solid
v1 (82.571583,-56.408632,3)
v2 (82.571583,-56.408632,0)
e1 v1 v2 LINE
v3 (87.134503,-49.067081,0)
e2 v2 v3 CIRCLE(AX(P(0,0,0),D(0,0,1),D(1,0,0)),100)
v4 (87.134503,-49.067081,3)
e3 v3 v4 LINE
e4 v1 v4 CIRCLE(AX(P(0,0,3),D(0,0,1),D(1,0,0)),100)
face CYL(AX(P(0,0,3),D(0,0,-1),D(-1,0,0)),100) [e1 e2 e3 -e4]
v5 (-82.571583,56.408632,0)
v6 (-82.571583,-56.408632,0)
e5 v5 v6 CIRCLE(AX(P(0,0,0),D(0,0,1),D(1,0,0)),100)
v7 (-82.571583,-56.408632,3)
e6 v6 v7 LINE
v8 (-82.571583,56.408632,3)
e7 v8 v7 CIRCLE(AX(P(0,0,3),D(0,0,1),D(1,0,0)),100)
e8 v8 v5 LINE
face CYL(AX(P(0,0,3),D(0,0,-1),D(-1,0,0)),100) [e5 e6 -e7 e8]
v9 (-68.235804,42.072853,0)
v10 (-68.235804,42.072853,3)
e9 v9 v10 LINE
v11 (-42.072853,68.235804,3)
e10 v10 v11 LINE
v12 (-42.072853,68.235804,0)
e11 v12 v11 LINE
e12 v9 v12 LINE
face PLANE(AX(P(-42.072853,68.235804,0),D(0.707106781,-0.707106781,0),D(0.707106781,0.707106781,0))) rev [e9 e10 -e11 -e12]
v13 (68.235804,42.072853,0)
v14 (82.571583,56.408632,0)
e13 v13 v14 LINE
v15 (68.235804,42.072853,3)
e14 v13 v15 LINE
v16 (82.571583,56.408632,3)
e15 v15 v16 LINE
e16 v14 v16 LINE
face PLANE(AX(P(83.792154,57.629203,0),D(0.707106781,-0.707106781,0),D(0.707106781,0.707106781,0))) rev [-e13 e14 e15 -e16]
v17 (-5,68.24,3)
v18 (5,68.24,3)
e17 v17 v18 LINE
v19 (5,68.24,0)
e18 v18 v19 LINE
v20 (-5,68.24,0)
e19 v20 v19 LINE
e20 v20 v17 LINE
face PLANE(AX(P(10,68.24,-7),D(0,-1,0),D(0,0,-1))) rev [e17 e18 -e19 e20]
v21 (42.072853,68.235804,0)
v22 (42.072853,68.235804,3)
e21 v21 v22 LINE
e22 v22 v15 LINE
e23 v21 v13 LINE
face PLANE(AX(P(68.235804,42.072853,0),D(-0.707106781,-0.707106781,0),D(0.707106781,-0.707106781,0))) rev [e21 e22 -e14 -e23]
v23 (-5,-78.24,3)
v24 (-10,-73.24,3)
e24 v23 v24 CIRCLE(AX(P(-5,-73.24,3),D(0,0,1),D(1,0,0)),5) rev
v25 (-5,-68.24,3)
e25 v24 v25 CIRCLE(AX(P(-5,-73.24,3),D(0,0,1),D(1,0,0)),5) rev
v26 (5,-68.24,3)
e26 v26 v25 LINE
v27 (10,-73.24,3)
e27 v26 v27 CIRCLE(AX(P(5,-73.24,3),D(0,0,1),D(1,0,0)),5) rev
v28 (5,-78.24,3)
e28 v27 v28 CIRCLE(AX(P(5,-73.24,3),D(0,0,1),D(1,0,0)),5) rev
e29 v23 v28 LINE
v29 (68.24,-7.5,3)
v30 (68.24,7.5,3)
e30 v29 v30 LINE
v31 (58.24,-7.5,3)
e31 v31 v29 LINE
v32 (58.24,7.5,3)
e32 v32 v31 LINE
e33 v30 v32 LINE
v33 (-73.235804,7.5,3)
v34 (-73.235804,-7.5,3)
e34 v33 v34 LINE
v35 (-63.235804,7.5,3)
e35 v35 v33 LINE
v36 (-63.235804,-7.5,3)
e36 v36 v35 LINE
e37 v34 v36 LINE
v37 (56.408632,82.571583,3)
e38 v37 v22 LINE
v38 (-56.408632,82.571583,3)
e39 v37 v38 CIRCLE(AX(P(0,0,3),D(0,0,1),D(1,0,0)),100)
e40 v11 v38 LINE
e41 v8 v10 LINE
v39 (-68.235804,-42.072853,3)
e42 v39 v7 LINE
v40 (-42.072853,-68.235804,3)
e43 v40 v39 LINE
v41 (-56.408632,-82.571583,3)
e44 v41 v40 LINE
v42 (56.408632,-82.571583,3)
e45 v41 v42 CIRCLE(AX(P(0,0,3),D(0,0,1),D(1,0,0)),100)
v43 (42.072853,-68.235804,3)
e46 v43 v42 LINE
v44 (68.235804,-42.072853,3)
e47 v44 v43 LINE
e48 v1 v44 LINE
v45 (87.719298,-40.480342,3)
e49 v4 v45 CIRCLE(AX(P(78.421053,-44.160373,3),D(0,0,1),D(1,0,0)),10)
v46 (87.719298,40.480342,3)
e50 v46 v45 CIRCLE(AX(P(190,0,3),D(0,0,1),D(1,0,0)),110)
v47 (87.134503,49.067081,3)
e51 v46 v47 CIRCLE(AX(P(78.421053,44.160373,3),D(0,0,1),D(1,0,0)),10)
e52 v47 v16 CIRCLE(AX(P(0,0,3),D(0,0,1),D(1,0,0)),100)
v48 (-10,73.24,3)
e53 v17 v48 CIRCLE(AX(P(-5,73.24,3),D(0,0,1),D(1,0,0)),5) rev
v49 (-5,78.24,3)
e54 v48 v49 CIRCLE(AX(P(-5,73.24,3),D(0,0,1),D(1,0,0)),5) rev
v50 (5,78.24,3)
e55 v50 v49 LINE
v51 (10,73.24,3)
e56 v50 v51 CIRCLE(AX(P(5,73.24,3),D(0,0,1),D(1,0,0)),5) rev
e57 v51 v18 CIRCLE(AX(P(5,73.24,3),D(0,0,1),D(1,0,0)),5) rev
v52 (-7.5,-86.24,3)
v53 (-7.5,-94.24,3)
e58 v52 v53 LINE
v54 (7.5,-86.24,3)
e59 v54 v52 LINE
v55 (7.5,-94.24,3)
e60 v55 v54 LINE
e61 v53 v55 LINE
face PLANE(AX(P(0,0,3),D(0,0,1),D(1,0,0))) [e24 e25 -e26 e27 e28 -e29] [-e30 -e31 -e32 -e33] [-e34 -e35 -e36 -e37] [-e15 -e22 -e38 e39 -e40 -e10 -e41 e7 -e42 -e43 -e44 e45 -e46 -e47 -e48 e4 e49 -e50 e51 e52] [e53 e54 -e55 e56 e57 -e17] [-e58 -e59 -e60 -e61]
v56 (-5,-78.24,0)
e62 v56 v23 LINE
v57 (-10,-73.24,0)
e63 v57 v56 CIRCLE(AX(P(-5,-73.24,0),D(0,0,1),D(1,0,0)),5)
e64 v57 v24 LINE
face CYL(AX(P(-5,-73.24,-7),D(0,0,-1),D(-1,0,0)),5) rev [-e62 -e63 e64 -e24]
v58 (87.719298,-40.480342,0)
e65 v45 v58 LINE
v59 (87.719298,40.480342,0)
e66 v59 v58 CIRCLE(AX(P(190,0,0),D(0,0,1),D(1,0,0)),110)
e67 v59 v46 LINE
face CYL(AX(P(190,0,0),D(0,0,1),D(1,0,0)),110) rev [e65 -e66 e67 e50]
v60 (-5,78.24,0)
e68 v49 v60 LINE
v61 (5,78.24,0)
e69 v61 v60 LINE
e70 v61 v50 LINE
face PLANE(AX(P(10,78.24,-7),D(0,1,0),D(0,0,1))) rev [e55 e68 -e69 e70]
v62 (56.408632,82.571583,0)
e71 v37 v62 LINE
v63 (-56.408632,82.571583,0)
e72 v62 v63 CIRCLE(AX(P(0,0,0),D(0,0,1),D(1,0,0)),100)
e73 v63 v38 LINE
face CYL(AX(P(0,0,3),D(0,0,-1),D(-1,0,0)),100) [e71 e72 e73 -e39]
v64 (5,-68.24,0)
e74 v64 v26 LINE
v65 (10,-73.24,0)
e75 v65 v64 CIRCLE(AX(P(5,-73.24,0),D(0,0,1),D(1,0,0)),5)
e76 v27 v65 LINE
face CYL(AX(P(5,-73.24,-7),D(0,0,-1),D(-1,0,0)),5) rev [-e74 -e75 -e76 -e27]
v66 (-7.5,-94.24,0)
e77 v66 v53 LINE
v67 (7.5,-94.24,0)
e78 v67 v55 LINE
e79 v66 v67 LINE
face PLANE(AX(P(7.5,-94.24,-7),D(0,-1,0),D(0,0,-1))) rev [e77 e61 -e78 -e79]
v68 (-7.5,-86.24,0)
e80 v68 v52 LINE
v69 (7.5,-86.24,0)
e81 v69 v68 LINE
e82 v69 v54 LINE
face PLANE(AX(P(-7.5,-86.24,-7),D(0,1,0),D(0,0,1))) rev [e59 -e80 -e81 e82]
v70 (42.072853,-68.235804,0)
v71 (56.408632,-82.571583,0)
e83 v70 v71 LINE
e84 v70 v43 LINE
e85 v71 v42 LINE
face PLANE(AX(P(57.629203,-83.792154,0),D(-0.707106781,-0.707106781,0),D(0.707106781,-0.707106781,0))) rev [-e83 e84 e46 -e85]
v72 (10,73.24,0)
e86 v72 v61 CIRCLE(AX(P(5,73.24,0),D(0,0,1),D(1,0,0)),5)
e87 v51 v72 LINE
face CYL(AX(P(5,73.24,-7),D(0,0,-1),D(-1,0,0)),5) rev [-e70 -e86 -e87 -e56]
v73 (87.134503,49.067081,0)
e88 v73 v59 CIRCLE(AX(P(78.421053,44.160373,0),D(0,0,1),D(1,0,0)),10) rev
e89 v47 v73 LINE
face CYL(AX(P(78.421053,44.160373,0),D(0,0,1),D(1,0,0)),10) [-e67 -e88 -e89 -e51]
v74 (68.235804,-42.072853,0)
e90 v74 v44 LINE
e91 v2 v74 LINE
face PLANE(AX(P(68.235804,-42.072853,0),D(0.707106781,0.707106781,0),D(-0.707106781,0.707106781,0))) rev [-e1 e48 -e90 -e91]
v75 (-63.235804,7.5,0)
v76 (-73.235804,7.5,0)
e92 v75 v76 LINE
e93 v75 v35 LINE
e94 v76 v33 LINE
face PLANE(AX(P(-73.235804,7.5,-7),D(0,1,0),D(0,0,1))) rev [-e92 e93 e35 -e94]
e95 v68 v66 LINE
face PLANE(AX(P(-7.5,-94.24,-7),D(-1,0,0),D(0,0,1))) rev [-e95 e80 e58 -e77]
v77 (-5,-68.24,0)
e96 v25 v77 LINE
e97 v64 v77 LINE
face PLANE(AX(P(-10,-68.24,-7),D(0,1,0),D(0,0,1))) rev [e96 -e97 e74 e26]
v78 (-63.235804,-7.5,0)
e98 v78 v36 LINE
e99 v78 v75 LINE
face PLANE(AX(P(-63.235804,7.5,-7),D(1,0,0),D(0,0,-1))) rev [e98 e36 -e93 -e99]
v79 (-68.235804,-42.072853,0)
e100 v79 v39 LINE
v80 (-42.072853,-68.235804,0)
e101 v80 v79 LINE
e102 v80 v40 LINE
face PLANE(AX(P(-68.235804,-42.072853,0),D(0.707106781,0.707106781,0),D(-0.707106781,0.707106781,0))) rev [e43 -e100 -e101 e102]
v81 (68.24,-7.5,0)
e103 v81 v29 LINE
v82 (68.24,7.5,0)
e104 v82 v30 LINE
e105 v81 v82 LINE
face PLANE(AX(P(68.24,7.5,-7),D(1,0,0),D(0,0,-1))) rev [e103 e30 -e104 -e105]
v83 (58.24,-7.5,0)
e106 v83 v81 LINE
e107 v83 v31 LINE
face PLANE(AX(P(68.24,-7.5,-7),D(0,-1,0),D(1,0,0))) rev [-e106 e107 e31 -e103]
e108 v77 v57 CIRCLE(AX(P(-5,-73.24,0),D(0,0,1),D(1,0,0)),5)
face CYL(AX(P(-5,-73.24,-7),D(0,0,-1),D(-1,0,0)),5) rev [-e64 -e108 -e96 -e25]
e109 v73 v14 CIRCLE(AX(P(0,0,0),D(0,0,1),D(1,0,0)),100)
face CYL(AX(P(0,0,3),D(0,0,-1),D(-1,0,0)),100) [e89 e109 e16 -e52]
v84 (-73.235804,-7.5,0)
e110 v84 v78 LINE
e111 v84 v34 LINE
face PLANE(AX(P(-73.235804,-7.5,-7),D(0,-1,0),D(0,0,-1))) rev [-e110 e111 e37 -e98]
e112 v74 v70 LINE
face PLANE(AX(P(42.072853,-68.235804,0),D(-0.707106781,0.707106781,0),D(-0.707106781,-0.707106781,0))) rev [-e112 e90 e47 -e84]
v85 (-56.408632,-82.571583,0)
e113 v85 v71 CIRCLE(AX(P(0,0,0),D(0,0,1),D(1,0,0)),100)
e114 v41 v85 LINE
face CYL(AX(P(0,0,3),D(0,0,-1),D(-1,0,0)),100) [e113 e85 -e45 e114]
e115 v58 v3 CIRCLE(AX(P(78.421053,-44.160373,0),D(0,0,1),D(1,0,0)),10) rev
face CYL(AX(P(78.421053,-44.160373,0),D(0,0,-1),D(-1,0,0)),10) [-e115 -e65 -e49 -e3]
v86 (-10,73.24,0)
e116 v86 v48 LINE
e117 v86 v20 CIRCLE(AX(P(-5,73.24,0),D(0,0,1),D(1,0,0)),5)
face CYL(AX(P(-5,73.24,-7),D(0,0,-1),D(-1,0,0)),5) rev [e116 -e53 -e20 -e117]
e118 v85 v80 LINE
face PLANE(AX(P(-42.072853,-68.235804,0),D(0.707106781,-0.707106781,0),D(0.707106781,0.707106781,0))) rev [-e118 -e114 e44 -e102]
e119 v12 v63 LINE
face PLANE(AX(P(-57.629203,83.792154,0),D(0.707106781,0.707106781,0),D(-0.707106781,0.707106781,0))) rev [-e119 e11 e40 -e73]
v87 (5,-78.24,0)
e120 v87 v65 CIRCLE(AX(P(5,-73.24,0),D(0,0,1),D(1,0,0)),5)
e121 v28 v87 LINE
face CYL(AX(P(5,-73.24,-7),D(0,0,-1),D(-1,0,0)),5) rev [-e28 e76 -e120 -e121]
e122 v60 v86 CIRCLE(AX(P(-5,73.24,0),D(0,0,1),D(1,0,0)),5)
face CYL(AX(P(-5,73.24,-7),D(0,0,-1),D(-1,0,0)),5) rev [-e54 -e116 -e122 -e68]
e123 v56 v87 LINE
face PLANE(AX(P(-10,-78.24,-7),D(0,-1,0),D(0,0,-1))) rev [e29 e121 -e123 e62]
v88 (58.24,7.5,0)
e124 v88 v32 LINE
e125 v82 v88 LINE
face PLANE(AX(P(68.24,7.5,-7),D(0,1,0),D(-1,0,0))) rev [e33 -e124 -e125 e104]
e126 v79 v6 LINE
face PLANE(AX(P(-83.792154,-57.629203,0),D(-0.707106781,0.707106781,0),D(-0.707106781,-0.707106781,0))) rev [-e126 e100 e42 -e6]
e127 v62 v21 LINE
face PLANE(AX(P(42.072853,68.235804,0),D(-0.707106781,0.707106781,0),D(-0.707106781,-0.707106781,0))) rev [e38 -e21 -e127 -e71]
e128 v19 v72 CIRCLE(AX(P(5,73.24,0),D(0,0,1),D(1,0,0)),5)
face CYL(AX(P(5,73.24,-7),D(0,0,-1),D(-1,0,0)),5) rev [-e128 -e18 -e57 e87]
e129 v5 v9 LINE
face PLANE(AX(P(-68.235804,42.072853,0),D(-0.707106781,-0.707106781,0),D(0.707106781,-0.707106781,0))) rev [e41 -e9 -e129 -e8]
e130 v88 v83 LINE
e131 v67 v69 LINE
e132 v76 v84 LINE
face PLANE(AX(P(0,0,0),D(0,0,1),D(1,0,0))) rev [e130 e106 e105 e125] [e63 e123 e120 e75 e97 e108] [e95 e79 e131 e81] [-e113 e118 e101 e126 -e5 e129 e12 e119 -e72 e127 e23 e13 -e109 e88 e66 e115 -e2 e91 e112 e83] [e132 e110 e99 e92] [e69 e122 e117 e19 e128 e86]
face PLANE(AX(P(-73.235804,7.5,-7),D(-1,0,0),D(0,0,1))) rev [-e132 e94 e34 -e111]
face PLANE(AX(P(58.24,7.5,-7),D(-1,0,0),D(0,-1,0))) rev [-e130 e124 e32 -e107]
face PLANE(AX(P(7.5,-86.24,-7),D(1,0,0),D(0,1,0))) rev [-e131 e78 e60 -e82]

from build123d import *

# Parameters (mm, degrees)
CROQUIS1_R              = 100
SALIENTE_EXTRUIR1_DEPTH = 3
CROQUIS3_R              = 110
CORTAR_EXTRUIR1_DEPTH   = 3
REDONDEO1_R             = 10
CORTAR_EXTRUIR2_DEPTH   = 142.453172607
CROQUIS6_W              = 10
CROQUIS6_H              = 15
CROQUIS6_W_2            = 20
CROQUIS6_H_2            = 10
CROQUIS6_W_3            = 15
CROQUIS6_H_3            = 8
CORTAR_EXTRUIR4_DEPTH   = 10
REDONDEO3_R             = 5


with BuildPart() as part:
    # Croquis1 → Saliente-Extruir1 (new body)
    with BuildSketch(Plane.XY):
        Circle(CROQUIS1_R)
    extrude(amount=SALIENTE_EXTRUIR1_DEPTH)

    # Croquis3 → Cortar-Extruir1 (cut)
    with BuildSketch(Plane.XY.offset(3)):
        with Locations((190, 0)):
            Circle(CROQUIS3_R)
    extrude(amount=-CORTAR_EXTRUIR1_DEPTH, mode=Mode.SUBTRACT)

    # Redondeo1
    redondeo1_edges = [part.edges().sort_by_distance(p)[0] for p in [
        (89.473684211, -44.659375654, 1.5),
        (89.473684211, 44.659375654, 1.5),
    ]]
    fillet(redondeo1_edges, radius=REDONDEO1_R)

    # Croquis4 → Cortar-Extruir2 (cut, through all)
    with BuildSketch(Plane.XY.offset(3)):
        Polygon((-57.629202667, -83.792153571), (-83.792153571, -57.629202667), (-68.235804385, -42.072853481), (-42.072853481, -68.235804385), align=None)
        Polygon((-57.629202667, 83.792153571), (-42.072853481, 68.235804385), (-68.235804385, 42.072853481), (-83.792153571, 57.629202667), align=None)
        Polygon((83.792153571, 57.629202667), (68.235804385, 42.072853481), (42.072853481, 68.235804385), (57.629202667, 83.792153571), align=None)
        Polygon((57.629202667, -83.792153571), (42.072853481, -68.235804385), (68.235804385, -42.072853481), (83.792153571, -57.629202667), align=None)
    extrude(amount=-CORTAR_EXTRUIR2_DEPTH, mode=Mode.SUBTRACT)

    # Croquis6 → Cortar-Extruir4 (cut)
    with BuildSketch(Plane.XY.offset(3)):
        with Locations((63.24, 0)):
            Rectangle(CROQUIS6_W, CROQUIS6_H)
        with Locations((-68.235804385, 0)):
            Rectangle(CROQUIS6_W, CROQUIS6_H)
        with Locations((0, 73.24)):
            Rectangle(CROQUIS6_W_2, CROQUIS6_H_2)
        with Locations((0, -73.24)):
            Rectangle(CROQUIS6_W_2, CROQUIS6_H_2)
        with Locations((0, -90.24)):
            Rectangle(CROQUIS6_W_3, CROQUIS6_H_3)
    extrude(amount=-CORTAR_EXTRUIR4_DEPTH, mode=Mode.SUBTRACT)

    # Redondeo3
    redondeo3_edges = [part.edges().sort_by_distance(p)[0] for p in [
        (10, 68.24, 1.5),
        (-10, 68.24, 1.5),
        (10, 78.24, 1.5),
        (-10, 78.24, 1.5),
        (10, -78.24, 1.5),
        (-10, -78.24, 1.5),
        (10, -68.24, 1.5),
        (-10, -68.24, 1.5),
    ]]
    fillet(redondeo3_edges, radius=REDONDEO3_R - 0.0001)  # a hair under: the kernel refuses the full size


solid = part.part
